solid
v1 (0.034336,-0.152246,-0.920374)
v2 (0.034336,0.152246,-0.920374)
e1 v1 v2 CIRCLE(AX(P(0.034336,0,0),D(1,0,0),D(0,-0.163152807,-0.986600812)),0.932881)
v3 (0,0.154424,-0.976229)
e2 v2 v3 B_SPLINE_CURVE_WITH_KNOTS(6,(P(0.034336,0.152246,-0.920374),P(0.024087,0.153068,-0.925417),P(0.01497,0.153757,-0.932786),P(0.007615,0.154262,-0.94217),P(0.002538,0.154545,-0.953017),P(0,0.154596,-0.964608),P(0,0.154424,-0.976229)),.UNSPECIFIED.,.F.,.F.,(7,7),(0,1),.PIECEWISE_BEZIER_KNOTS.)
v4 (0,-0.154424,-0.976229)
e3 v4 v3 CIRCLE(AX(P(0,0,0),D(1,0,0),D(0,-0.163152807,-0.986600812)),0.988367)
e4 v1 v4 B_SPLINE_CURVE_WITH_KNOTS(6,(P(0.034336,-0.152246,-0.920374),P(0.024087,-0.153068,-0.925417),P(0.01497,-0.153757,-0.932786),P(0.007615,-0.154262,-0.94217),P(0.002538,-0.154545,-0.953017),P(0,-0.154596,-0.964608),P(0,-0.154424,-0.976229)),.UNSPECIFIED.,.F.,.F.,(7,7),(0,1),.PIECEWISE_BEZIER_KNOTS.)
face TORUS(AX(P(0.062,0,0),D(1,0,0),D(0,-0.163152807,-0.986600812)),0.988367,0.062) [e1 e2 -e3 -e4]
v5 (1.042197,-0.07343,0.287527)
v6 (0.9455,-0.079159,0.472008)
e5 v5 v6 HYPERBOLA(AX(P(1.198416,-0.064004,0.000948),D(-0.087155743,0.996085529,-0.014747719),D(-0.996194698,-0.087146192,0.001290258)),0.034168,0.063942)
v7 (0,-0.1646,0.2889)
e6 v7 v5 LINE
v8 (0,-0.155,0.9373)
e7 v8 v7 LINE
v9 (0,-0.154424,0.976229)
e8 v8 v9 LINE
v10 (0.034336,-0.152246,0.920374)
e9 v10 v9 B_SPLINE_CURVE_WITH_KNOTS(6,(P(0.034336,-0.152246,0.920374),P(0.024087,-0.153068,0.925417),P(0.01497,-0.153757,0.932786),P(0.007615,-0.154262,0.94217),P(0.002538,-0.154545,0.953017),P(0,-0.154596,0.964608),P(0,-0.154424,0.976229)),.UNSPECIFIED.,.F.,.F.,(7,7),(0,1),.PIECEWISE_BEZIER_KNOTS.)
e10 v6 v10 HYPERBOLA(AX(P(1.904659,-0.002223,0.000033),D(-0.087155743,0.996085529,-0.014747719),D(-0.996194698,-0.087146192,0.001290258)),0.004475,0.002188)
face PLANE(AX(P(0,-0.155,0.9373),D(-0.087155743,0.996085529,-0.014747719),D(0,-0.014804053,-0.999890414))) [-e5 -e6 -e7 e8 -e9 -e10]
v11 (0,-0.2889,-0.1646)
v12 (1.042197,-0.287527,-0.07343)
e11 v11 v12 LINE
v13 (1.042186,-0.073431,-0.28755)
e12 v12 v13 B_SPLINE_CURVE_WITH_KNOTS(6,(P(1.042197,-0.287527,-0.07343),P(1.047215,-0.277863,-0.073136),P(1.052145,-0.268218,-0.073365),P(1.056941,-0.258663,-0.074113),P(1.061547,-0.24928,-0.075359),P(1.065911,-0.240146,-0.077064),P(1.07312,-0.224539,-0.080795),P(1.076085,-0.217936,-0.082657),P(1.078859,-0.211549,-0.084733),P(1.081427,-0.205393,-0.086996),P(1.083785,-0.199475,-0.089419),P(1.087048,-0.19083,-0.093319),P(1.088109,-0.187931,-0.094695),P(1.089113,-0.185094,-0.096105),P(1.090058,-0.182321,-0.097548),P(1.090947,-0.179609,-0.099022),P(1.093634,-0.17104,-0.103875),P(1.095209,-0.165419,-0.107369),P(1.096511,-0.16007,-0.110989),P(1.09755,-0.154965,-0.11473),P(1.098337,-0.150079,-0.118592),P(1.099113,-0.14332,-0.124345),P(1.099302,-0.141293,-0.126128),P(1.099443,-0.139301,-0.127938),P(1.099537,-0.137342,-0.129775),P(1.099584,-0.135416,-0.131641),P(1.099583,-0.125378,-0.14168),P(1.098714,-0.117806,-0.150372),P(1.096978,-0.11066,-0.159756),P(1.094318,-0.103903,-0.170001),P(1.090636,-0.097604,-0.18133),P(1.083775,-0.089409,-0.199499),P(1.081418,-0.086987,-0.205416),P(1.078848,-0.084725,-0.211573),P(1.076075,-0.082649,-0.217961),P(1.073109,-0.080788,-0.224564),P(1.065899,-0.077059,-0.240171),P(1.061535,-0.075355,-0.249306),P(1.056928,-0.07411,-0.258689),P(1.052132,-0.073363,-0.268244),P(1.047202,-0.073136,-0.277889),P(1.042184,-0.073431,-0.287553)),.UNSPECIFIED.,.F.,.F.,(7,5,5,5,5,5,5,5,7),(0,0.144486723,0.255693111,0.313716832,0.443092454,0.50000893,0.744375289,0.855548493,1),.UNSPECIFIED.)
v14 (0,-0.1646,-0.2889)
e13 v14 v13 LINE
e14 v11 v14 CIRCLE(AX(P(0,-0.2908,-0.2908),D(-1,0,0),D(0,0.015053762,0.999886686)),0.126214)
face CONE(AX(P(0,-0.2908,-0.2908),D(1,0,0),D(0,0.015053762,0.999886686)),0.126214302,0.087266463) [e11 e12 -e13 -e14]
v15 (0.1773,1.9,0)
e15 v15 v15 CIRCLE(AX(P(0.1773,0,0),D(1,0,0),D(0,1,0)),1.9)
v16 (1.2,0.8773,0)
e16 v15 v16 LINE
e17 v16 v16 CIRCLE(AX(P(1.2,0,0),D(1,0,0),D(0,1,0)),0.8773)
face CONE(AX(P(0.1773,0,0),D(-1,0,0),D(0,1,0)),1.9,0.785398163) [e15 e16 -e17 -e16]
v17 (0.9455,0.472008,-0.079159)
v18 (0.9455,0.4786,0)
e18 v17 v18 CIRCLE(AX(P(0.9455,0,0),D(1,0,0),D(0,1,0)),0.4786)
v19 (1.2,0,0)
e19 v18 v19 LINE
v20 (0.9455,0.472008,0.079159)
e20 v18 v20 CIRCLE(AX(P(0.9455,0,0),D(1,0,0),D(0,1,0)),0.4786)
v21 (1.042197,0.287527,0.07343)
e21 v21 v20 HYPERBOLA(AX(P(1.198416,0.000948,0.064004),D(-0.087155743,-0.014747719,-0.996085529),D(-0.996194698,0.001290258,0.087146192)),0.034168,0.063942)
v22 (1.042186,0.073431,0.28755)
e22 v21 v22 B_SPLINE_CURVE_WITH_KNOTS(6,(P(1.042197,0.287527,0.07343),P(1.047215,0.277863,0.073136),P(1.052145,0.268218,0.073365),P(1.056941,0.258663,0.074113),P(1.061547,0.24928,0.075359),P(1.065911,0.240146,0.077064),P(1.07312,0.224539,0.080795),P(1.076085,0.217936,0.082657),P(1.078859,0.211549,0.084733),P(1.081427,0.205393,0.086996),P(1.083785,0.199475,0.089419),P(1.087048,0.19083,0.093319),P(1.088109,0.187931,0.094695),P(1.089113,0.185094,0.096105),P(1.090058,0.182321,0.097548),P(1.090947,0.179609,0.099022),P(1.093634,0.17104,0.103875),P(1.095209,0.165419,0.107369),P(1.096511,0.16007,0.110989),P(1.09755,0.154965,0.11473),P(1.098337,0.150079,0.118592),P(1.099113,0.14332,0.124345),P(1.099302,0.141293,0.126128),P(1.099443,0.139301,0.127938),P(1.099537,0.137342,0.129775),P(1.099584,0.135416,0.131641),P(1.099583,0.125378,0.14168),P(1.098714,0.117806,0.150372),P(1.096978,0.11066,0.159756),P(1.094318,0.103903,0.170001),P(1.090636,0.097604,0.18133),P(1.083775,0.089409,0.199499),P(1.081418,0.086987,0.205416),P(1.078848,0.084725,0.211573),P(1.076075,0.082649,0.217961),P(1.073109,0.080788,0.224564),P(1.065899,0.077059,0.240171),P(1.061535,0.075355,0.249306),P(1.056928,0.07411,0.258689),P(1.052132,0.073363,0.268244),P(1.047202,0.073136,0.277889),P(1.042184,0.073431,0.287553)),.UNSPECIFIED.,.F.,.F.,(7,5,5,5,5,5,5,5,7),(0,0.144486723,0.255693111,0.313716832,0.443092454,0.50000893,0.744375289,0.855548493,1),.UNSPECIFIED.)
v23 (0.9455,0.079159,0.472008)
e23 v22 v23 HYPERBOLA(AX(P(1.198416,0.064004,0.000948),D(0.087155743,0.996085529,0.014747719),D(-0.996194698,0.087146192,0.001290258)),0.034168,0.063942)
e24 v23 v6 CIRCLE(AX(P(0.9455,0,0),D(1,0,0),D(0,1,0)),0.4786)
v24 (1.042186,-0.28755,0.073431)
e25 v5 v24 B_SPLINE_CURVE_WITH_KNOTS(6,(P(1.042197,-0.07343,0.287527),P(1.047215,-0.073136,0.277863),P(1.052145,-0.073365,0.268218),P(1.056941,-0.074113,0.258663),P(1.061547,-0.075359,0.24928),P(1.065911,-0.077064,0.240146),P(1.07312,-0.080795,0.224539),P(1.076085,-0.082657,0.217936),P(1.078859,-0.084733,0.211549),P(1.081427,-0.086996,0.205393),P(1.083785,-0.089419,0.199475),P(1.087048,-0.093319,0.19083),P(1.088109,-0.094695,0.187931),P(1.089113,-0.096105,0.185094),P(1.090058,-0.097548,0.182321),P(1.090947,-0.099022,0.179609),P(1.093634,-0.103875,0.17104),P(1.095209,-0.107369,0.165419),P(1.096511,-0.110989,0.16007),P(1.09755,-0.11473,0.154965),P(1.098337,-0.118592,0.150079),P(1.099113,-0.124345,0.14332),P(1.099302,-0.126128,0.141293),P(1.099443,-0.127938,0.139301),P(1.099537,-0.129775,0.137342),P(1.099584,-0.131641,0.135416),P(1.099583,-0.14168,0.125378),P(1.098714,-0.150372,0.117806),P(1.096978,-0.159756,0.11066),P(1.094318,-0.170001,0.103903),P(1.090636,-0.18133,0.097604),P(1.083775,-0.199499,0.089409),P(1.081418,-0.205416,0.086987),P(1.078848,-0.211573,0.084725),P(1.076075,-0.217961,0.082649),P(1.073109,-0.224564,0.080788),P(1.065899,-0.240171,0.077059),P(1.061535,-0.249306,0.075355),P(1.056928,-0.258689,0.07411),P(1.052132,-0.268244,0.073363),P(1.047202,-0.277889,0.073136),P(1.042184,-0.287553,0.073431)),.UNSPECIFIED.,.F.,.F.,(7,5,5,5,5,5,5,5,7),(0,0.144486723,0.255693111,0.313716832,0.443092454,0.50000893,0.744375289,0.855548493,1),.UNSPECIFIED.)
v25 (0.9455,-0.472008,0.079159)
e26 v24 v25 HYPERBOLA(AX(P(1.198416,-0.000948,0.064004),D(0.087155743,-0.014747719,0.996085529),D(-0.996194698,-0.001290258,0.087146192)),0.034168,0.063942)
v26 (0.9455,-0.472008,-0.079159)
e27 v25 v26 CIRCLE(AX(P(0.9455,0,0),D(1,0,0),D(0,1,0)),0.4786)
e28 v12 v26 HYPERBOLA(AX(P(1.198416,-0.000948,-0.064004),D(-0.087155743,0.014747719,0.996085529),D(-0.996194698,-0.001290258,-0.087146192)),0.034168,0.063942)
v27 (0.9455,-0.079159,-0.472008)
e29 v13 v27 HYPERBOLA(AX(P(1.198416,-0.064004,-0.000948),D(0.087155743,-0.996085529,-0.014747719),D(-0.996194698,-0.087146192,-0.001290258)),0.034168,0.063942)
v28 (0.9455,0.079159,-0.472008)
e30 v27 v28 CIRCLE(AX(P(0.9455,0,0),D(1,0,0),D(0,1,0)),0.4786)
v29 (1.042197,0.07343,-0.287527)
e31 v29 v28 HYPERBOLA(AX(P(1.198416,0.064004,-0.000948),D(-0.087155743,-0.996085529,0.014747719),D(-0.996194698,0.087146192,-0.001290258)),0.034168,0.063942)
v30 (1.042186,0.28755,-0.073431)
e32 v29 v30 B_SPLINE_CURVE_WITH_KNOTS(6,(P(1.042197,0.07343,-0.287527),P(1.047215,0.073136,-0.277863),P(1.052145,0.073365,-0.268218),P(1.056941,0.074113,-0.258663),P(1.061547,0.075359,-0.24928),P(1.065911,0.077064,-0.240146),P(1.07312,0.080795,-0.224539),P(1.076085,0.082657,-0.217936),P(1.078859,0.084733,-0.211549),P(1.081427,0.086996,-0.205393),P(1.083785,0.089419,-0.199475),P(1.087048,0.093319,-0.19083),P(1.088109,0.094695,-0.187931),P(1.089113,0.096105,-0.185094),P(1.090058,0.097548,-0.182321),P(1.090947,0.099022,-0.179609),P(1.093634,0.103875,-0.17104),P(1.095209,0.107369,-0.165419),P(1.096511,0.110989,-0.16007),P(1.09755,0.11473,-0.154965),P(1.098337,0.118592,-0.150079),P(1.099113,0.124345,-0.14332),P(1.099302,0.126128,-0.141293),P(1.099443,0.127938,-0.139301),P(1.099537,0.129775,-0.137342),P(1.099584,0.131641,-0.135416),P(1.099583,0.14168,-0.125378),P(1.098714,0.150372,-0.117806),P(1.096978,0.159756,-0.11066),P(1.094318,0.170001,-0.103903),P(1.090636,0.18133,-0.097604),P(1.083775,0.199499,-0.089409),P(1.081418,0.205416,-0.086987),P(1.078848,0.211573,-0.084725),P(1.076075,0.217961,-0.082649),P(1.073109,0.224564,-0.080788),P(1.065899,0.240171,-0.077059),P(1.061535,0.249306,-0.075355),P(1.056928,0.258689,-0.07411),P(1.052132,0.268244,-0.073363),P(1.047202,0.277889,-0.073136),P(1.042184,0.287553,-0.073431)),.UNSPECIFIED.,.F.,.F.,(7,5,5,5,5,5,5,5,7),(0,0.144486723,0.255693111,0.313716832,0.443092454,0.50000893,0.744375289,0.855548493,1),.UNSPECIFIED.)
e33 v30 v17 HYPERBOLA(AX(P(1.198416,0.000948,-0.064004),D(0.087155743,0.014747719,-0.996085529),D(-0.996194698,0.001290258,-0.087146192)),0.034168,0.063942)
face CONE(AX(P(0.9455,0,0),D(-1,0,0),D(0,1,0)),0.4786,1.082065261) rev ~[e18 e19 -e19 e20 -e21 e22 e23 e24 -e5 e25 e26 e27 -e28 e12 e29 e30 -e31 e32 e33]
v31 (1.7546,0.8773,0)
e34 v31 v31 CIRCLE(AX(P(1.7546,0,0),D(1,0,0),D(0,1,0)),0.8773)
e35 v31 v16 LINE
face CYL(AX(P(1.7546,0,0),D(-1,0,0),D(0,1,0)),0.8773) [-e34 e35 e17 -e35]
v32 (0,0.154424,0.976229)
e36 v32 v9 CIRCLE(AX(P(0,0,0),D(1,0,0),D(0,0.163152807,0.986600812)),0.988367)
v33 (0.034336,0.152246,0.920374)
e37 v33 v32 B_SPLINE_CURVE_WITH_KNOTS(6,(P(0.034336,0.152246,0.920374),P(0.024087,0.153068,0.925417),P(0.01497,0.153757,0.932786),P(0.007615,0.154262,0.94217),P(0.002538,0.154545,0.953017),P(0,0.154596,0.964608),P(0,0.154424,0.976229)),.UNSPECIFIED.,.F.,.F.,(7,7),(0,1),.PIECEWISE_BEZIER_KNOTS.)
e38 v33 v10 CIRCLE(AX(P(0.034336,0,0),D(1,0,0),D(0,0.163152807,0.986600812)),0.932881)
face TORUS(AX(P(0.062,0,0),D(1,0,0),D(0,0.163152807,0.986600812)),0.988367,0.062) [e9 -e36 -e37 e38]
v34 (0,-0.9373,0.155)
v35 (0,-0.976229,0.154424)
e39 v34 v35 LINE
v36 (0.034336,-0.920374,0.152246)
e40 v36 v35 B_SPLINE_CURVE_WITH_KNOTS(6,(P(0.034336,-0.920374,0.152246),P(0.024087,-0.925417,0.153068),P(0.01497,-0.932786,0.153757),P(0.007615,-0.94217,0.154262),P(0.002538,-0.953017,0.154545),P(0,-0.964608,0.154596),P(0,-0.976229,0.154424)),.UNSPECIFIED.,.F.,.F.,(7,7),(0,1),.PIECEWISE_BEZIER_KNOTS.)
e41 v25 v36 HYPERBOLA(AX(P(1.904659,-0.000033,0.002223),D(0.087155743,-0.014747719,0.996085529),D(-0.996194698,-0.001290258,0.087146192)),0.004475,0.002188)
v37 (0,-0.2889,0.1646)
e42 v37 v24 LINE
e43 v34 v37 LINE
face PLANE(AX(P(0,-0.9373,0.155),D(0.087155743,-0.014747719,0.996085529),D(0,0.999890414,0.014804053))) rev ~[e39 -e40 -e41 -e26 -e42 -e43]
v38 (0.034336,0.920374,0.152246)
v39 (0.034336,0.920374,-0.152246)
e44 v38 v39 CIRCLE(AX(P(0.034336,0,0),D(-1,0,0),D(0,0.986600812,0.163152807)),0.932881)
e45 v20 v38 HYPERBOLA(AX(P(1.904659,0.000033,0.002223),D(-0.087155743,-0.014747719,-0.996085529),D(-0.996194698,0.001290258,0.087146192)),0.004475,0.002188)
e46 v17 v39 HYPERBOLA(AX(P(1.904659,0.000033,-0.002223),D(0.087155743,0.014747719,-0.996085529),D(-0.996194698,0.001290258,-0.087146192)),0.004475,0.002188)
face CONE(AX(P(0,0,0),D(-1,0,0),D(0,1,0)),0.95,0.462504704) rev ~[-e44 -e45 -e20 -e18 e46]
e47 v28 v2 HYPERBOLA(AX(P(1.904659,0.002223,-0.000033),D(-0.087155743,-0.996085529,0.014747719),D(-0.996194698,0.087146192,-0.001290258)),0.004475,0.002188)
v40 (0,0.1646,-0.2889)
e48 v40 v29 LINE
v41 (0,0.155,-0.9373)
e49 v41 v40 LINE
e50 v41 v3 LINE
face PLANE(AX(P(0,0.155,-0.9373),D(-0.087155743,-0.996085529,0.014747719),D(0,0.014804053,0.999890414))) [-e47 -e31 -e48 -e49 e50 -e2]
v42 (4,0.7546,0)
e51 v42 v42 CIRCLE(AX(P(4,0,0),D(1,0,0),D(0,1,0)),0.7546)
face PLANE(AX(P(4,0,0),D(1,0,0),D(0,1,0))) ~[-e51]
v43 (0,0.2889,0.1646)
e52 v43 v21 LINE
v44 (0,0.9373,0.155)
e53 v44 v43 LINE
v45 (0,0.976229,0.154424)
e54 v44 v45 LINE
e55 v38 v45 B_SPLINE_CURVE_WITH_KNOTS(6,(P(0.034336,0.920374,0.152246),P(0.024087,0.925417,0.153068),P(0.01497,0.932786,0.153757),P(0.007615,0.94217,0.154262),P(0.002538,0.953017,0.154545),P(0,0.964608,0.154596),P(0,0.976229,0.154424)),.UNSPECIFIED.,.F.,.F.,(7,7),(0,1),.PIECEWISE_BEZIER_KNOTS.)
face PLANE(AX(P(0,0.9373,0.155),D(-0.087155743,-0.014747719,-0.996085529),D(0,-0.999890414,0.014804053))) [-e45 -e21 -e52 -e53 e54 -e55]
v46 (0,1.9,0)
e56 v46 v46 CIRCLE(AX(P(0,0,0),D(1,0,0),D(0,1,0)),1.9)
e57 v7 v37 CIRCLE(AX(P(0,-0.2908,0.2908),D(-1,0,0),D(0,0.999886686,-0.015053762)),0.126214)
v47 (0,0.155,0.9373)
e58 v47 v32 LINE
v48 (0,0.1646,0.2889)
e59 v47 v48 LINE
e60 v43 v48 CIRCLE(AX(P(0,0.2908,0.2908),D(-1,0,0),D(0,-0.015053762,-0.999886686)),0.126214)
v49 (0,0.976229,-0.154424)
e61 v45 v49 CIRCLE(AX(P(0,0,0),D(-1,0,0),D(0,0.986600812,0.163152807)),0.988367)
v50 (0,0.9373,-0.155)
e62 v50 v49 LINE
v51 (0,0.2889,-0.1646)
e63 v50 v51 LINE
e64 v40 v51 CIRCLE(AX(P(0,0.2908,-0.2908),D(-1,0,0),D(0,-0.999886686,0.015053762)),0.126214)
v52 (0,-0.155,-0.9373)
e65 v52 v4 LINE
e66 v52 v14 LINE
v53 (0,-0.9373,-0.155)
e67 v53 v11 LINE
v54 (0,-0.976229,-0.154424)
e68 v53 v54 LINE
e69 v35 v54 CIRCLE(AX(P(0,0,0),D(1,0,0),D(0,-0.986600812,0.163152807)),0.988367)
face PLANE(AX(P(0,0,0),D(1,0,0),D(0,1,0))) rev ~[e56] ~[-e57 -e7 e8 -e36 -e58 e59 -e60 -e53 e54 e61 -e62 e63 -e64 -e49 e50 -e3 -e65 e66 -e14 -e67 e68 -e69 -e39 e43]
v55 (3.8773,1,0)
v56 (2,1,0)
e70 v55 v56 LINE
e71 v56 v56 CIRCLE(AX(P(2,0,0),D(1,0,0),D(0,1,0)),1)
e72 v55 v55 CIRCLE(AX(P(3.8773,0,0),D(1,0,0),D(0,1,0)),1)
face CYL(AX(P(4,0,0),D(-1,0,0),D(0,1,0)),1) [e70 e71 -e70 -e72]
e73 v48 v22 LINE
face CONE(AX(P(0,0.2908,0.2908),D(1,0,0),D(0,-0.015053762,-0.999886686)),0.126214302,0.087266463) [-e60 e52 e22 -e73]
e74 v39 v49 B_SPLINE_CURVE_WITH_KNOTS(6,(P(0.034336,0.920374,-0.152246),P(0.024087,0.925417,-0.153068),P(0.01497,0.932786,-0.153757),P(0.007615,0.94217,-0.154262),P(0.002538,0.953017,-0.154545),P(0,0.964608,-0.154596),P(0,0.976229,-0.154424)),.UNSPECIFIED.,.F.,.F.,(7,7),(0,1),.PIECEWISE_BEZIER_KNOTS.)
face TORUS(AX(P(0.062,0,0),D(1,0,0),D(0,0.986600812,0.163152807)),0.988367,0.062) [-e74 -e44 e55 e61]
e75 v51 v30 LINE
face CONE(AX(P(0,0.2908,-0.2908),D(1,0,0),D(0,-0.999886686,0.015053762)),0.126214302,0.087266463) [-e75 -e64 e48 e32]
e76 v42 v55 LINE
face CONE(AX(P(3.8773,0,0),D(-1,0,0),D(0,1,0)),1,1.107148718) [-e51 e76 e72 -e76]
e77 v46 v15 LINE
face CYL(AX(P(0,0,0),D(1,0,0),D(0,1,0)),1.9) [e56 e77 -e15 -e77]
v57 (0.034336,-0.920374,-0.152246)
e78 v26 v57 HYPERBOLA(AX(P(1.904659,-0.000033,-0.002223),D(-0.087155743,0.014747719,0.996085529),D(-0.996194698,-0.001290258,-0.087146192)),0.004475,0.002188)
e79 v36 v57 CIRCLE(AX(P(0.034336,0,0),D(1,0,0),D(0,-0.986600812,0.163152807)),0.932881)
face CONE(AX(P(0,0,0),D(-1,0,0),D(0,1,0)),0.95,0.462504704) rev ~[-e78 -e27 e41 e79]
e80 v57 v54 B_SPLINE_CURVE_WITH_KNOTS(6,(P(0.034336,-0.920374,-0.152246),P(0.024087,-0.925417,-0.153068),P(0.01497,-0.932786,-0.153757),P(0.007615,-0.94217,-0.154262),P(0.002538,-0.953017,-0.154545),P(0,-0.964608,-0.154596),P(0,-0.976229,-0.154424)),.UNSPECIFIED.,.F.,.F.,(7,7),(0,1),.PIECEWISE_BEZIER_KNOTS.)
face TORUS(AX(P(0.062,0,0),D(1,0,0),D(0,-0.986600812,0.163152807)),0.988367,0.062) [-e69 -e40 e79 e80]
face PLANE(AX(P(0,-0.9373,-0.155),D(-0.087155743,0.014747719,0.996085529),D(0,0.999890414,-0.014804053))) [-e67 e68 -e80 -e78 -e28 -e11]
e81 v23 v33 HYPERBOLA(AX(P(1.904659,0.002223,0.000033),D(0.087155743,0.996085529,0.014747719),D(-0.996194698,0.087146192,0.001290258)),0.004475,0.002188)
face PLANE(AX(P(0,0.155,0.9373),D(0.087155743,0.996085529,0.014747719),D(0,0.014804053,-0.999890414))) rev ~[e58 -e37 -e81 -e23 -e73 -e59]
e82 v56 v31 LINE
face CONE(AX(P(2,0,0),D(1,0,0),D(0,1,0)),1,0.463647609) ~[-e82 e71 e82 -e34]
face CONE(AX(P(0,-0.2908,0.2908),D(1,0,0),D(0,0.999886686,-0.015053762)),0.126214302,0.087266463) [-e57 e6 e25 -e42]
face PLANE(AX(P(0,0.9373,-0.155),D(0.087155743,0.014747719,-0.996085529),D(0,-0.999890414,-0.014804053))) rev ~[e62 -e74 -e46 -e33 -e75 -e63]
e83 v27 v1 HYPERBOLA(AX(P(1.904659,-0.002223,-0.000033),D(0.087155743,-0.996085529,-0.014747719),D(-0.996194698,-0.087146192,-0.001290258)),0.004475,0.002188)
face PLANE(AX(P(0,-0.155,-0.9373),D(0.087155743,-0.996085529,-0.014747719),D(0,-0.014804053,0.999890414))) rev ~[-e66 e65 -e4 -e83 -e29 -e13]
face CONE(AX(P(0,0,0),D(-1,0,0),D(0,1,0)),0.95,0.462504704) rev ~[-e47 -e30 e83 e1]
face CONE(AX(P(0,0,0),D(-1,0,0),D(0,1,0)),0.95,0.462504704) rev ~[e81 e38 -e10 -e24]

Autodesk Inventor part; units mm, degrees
ref_plane "YZ Plane" through (0, 0, 0) normal (1, 0, 0) x (0, 1, 0)
ref_plane "XZ Plane" through (0, 0, 0) normal (0, 1, 0) x (-1, 0, 0)
sketch "Sketch1" plane through (0, 0, 0) normal (0, 0, 1) x (1, 0, 0)
  line L0 (1.2, 0) -> (4, 0)
  line L1 (4, 0) -> (4, 1)
  line L2 (4, 1) -> (2, 1)
  line L3 (2, 1) -> (1.7546, 0.8773)
  line L4 (1.7546, 0.8773) -> (1.2, 0.8773)
  line L5 (0, 1.9) -> (0, 0.95)
  line L6 (0, 0.95) -> (0.9455, 0.4786)
  line L7 (0.9455, 0.4786) -> (1.2, 0)
  line L8 (-0.8, 0) -> (4.8, 0) projected
  line L9 (0, -0.38) -> (0, 2.28) projected
  line L10 (0, 1.9) -> (0.1773, 1.9)
  line L11 (0.1773, 1.9) -> (1.2, 0.8773)
  line L12 (2, 1) -> (1.0773, 1) construction
  dimension "d1" = 2
  dimension "d2" = 2
  dimension "d3" = 1.7546
  dimension "d4" = 1.9
  dimension "d5" = 26.5
  dimension "d6" = 62
  dimension "d7" = 1.2
  dimension "d8" = 0.2454
  dimension "d12" = 3.8
  dimension "d13" = 45
  dimension "d15" = 4
  dimension "d24" = 1.2
revolve "Body" add sketch "Sketch1" angle 360 about axis through (1.2, 0, 0) along (1, 0, 0) contours L7 L6 L5 L10 L11 L4 L3 L2 L1 L0
sketch "Sketch2" plane through (0, 0, 0) normal (-1, 0, 0) x (0, 0, 1)
  line L0 (0, 0.95) -> (0, 0) construction
  line L1 (0, 0) -> (0.95, 0) construction
  arc A0 (0.285, 0) -> (0, 0.285) centre (0, 0) ccw construction
  arc A1 (0.3325, 0) -> (0, 0.3325) centre (0, 0) ccw construction
  arc A2 (0.9373, 0.155) -> (0.155, 0.9373) centre (0, 0) ccw
  line L2 (0, 0) -> (0.6718, 0.6718) construction
  line L3 (0.155, 0.9373) -> (0.1646, 0.2889)
  line L4 (0.9373, 0.155) -> (0.2889, 0.1646)
  arc A3 (0.155, 0.9373) -> (0, 0.95) centre (0, 0) ccw
  arc A4 (0.95, 0) -> (0.9373, 0.155) centre (0, 0) ccw
  line L5 (0, -2.66) -> (0, 2.66) projected
  line L6 (-2.66, 0) -> (2.66, 0) projected
  arc A5 (0.155, -0.9373) -> (0.9373, -0.155) centre (0, 0) ccw
  line L7 (0.155, -0.9373) -> (0.1646, -0.2889)
  line L8 (0.9373, -0.155) -> (0.2889, -0.1646)
  arc A6 (0, -0.95) -> (0.155, -0.9373) centre (0, 0) ccw
  arc A7 (0.9373, -0.155) -> (0.95, 0) centre (0, 0) ccw
  arc A8 (-0.155, 0.9373) -> (-0.9373, 0.155) centre (0, 0) ccw
  line L9 (-0.155, 0.9373) -> (-0.1646, 0.2889)
  line L10 (-0.9373, 0.155) -> (-0.2889, 0.1646)
  arc A9 (0, 0.95) -> (-0.155, 0.9373) centre (0, 0) ccw
  arc A10 (-0.9373, 0.155) -> (-0.95, 0) centre (0, 0) ccw
  arc A11 (-0.155, -0.9373) -> (0, -0.95) centre (0, 0) ccw
  arc A12 (-0.9373, -0.155) -> (-0.155, -0.9373) centre (0, 0) ccw
  arc A13 (-0.95, 0) -> (-0.9373, -0.155) centre (0, 0) ccw
  line L11 (-0.9373, -0.155) -> (-0.2889, -0.1646)
  line L12 (-0.155, -0.9373) -> (-0.1646, -0.2889)
  arc A14 (0.1646, 0.2889) -> (0.2889, 0.1646) centre (0.2908, 0.2908) ccw
  arc A15 (0.2889, -0.1646) -> (0.1646, -0.2889) centre (0.2908, -0.2908) ccw
  arc A16 (-0.2889, 0.1646) -> (-0.1646, 0.2889) centre (-0.2908, 0.2908) ccw
  arc A17 (-0.1646, -0.2889) -> (-0.2889, -0.1646) centre (-0.2908, -0.2908) ccw
  point P0 (0.6718, -0.6718)
  point P1 (-0.6718, 0.6718)
  point P2 (-0.6718, -0.6718)
  dimension "d17" = 0.57
  dimension "d18" = 0.665
  dimension "d19" = 1.9
  dimension "d20" = 45
  dimension "d21" = 0.155
extrude "Slot" add sketch "Sketch2" against normal up to next draft 5 contours L4 A14 L3 A2 | A5 L7 A15 L8 | L9 A16 L10 A8 | A12 L11 A17 L12
fillet "Fillet1" radius 0.062 4 edges at (0, 0.95, 0) (0, 0, -0.95) (0, -0.95, 0) (0, 0, 0.95)
thread "Thread" size "M2x0.4" class "6g" standard "ISO Metric profile" length 2
chamfer "Chamfer1" distance 0.2454 distance2 0.1227 1 edges at (4, -1, 0) measured on face at (4, 0.479, -0.3842)
ref_plane "Work Plane2" through (3.35, 0, 0) normal (0, 0, -1) x (1, 0, 0)
equation "\"d1\" = GEL"
equation "\"d2\" = GD"
equation "\"d3\" = BDM"
equation "\"d4\" = SDM"
equation "\"d7\" = INTI"
equation "\"d8\" = GAL"
equation "\"d12\" = KOD"
equation "\"d13\" = 0.5 * SEWI"
equation "\"d15\" = NLG"
equation "\"d24\" = KOH"
equation "\"d17\" = 0.3 * SDM"
equation "\"d18\" = 0.35 * SDM"
equation "\"d19\" = SDM"
equation "\"d21\" = 0.5 * SBR"
equation "\"d23\" = 0.2 * SBR"
equation "\"d10\" = GEL"
equation "\"d25\" = -0.5 * SPD + 0.5 * GD"
equation "\"d26\" = 0.5 * GAL"
equation "\"NLG\" = 4"
equation "\"GEL\" = 2"
equation "\"GAL\" = 0.61345 * PTC"
equation "\"SPD\" = NND - 1.2269 * PTC"
equation "\"KOD\" = 3.8"
equation "\"KOH\" = 1.2"
equation "\"SBR\" = 0.31"
equation "\"INTI\" = 1.2"
equation "\"SDM\" = 1.9"
equation "\"GD\" = NND"
equation "\"BDM\" = NND - GAL"
equation "\"SEWI\" = 90deg"
equation "\"d9\" = SDM"
equation "\"GUL\" = 0.61345 * PTC"
equation "\"TOA\" = 30deg"
equation "\"EPV\" = 2.2"
equation "\"THREADDIA\" = 2"
equation "\"PTC\" = 0.4"
equation "\"NND\" = 2"
equation "\"GD1\" = THREADDIA - 1.2269 * PTC"
properties part number "ISO 7046-1 - M2 x 4 - 4.8 - H" material "Steel"
